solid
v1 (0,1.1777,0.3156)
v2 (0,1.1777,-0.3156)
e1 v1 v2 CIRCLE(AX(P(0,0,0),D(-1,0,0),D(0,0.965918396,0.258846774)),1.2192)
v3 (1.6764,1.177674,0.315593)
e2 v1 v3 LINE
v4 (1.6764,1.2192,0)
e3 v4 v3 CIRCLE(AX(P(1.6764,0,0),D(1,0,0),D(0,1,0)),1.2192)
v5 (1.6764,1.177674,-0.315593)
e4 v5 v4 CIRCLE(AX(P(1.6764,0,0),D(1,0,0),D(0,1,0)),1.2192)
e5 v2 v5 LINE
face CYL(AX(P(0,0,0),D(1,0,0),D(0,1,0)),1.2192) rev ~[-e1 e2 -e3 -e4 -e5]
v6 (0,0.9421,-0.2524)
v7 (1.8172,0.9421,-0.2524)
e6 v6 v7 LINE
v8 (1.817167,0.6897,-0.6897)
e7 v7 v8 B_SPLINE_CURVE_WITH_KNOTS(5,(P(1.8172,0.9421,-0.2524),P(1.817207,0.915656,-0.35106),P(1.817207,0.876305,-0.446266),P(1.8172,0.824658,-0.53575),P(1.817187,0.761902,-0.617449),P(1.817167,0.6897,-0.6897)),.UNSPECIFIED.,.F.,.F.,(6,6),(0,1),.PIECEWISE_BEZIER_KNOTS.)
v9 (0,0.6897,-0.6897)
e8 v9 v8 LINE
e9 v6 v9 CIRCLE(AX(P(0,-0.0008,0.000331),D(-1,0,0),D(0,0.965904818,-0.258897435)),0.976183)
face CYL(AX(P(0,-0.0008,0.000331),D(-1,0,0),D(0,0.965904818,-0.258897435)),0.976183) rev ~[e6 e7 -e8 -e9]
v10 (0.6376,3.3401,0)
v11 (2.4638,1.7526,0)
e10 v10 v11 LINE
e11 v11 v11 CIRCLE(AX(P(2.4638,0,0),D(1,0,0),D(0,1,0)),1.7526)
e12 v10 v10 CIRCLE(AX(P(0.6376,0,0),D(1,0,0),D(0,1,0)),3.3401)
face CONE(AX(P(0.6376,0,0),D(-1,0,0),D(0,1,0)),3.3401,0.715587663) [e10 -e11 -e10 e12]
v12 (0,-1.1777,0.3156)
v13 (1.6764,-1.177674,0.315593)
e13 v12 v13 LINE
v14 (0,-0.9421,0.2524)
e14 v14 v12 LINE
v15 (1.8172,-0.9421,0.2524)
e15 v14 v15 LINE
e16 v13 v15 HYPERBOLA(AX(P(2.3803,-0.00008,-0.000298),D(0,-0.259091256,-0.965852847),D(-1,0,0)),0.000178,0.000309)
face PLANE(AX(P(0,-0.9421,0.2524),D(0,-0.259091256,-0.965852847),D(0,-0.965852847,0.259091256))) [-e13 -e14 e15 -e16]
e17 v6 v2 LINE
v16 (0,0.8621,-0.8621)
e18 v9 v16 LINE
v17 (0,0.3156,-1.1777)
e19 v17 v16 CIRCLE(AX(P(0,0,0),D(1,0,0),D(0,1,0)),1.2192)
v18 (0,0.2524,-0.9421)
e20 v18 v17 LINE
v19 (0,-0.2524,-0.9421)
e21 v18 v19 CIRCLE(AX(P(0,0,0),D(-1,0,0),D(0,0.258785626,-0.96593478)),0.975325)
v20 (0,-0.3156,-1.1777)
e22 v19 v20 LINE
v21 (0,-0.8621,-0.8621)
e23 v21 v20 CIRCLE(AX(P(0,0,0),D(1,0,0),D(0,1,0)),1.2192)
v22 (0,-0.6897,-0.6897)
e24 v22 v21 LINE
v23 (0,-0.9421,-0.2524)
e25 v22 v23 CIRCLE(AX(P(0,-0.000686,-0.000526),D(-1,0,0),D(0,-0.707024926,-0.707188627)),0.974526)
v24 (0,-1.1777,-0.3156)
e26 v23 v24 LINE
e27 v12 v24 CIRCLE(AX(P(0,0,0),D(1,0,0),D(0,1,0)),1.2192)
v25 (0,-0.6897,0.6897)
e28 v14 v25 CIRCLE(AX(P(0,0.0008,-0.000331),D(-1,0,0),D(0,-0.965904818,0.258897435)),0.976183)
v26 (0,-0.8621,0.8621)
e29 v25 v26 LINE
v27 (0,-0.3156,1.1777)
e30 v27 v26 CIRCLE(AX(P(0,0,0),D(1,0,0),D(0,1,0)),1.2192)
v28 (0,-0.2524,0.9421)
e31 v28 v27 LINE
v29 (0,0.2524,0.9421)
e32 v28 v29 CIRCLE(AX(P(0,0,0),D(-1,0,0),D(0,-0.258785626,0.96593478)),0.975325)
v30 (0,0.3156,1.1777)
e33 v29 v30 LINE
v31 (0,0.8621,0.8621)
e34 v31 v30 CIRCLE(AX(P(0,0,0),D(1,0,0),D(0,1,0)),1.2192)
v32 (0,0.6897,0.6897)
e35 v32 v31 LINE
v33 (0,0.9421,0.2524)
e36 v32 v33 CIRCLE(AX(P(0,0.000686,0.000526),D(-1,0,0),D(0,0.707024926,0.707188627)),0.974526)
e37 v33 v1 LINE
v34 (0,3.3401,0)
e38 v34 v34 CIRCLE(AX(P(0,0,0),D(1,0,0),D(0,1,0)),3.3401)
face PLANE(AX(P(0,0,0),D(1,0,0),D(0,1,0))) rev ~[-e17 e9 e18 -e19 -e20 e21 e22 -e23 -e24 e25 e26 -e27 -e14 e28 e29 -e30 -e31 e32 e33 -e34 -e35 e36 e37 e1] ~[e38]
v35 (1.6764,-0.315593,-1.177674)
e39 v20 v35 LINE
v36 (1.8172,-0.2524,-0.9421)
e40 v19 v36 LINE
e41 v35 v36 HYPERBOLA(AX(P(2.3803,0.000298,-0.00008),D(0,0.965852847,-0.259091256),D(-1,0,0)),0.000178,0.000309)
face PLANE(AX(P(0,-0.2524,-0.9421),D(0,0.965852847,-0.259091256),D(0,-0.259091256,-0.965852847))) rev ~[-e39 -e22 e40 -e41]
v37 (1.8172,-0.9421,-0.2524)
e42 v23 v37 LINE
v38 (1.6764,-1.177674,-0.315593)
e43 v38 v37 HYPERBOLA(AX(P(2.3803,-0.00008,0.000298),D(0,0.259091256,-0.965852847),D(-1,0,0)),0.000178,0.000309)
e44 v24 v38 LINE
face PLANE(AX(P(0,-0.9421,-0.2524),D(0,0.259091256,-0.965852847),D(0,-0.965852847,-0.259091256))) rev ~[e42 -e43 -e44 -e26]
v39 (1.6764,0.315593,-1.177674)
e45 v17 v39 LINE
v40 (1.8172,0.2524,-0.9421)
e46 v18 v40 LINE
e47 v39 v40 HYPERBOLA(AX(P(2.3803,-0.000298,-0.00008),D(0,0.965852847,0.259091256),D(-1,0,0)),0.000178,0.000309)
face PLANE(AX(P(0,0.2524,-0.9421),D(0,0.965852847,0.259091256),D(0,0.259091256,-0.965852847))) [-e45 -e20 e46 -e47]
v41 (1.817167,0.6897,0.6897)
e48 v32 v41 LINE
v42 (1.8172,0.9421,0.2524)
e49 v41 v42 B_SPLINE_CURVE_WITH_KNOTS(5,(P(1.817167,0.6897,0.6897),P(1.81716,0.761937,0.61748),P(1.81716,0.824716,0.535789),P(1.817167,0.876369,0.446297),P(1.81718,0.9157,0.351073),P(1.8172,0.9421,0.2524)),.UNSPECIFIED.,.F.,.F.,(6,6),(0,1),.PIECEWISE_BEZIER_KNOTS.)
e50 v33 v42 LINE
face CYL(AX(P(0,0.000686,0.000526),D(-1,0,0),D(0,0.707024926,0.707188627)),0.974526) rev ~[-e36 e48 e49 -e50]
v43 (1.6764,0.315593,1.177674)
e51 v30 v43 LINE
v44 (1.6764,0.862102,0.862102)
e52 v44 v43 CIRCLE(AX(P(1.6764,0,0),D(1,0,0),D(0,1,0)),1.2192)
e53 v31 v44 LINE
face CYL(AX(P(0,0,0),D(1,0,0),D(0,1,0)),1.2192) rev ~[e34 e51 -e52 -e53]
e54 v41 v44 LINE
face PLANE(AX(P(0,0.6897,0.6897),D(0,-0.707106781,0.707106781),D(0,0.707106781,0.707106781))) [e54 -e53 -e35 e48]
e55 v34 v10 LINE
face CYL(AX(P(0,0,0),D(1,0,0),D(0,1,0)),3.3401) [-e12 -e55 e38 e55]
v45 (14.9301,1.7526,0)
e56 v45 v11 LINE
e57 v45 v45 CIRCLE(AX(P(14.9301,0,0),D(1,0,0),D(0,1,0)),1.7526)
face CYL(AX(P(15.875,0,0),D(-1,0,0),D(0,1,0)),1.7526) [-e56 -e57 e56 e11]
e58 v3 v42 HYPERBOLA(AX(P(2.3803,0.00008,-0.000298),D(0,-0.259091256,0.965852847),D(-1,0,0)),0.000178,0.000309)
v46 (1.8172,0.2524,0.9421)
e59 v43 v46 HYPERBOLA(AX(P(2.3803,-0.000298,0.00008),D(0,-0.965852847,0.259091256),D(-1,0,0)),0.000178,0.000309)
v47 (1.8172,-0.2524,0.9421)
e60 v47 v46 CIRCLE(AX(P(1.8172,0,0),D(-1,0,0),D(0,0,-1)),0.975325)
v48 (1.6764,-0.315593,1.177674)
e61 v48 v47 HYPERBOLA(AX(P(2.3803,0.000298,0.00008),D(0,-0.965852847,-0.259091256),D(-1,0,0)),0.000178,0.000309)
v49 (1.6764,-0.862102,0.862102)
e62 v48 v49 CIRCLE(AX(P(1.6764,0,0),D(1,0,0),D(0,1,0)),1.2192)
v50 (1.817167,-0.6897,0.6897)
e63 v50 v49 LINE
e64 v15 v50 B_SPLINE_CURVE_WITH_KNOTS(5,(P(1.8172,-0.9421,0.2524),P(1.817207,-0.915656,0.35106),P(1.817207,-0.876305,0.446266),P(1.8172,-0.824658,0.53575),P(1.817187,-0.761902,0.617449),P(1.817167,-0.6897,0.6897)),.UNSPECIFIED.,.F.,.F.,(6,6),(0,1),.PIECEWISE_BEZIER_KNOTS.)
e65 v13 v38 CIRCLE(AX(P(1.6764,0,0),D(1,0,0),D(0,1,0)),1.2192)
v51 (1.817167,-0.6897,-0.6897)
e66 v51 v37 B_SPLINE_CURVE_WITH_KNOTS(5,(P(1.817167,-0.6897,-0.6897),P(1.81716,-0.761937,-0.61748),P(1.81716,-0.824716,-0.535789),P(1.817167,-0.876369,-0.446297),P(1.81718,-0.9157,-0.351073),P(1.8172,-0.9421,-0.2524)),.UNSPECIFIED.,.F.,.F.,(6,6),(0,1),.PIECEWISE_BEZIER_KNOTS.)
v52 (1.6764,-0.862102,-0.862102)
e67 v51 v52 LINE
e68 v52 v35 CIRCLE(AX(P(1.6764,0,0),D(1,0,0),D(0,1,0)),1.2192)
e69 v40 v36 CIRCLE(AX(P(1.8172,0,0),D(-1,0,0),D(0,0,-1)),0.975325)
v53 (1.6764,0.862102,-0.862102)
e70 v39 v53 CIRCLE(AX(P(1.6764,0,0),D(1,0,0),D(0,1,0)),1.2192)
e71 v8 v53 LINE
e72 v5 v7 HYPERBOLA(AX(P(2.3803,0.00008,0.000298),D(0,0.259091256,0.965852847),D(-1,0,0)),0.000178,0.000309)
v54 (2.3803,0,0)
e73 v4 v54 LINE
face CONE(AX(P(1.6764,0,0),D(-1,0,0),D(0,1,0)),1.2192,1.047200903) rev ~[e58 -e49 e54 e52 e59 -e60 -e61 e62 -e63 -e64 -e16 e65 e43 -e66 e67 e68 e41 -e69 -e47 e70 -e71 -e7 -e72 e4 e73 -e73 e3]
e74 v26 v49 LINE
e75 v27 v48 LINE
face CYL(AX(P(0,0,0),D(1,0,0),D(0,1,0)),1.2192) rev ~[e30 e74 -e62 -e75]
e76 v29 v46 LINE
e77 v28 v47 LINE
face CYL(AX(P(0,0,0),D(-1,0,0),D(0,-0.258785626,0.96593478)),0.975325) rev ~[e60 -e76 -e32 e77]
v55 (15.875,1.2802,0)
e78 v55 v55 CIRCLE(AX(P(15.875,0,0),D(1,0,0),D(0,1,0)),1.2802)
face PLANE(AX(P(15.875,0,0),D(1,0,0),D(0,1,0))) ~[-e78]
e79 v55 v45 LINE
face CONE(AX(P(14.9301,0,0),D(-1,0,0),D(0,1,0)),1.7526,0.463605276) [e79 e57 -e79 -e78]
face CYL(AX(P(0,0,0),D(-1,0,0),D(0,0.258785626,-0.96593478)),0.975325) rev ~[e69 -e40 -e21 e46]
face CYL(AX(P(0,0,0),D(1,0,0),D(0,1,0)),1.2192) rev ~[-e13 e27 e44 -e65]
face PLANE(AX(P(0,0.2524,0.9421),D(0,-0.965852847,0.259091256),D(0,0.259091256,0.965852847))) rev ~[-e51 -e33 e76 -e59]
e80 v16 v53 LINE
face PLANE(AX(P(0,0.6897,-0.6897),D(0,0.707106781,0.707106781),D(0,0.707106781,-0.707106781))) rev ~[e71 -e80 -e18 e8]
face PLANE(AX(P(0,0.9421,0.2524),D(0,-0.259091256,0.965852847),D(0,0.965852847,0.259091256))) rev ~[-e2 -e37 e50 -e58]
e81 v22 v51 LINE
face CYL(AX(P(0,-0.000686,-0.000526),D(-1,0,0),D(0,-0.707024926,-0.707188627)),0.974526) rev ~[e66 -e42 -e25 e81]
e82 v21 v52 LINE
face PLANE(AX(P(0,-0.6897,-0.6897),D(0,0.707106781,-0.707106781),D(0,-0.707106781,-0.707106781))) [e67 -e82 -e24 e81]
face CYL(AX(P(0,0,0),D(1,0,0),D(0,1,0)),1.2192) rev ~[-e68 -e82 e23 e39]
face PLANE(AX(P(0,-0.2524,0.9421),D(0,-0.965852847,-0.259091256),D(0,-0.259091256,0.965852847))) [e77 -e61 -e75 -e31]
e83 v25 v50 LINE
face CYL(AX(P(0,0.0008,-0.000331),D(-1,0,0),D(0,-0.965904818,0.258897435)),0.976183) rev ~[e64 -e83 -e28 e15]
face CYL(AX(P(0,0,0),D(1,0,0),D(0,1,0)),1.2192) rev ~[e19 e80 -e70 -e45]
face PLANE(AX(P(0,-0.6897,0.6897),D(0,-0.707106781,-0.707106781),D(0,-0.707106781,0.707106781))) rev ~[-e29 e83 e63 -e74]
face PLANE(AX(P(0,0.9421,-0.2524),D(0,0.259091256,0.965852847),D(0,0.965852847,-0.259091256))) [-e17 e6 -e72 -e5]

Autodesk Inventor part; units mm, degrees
ref_plane "YZ Plane" through (0, 0, 0) normal (1, 0, 0) x (0, 1, 0)
ref_plane "XZ Plane" through (0, 0, 0) normal (0, 1, 0) x (-1, 0, 0)
sketch "Sketch1" plane through (0, 0, 0) normal (0, 0, 1) x (1, 0, 0)
  line L0 (15.875, 0) -> (15.875, 1.7526)
  line L1 (15.875, 1.7526) -> (2.4638, 1.7526)
  line L2 (0, 3.3401) -> (0, 1.2192)
  line L3 (0, 1.2192) -> (1.6764, 1.2192)
  line L4 (1.6764, 1.2192) -> (2.3803, 0)
  line L5 (2.3803, 0) -> (15.875, 0)
  line L6 (0, 3.3401) -> (0.6376, 3.3401)
  line L7 (0.6376, 3.3401) -> (2.4638, 1.7526)
  line L8 (-3.175, 0) -> (19.05, 0) projected
  line L9 (0, -0.668) -> (0, 4.0081) projected
  dimension "d0" = 15.875
  dimension "d1" = 1.6764
  dimension "d2" = 3.5052
  dimension "d3" = 2.4638
  dimension "d4" = 41
  dimension "d5" = 2.4384
  dimension "d6" = 60
  dimension "d7" = 6.6802
revolve "Body" add sketch "Sketch1" angle 360 about axis through (2.3803, 0, 0) along (1, 0, 0) contours L5 L4 L3 L2 L6 L7 L1 L0
sketch "Sketch2" plane through (0, 0, 0) normal (-1, 0, 0) x (0, 0, 1)
  circle A0 centre (0, 0) radius 3.3401 projected
  circle A1 centre (0, 0) radius 1.2192 projected
  line L0 (0.9421, 0.2524) -> (1.1777, 0.3156)
  line L1 (0.9421, -0.2524) -> (1.1777, -0.3156)
  arc A2 (0.9421, -0.2524) -> (0.9421, 0.2524) centre (0, 0) ccw
  arc A3 (1.1777, -0.3156) -> (1.1777, 0.3156) centre (0, 0) ccw
  line L2 (0, -4.6761) -> (0, 4.6761) projected
  line L3 (-4.6761, 0) -> (4.6761, 0) projected
  line L4 (0.9421, 0.2524) -> (0, 0) construction
  line L5 (0, 0) -> (0.9421, -0.2524) construction
  line L6 (0.2524, 0.9421) -> (0.3156, 1.1777)
  line L7 (0.6897, 0.6897) -> (0.8621, 0.8621)
  arc A4 (0.6897, 0.6897) -> (0.2524, 0.9421) centre (0, 0) ccw
  arc A5 (0.8621, 0.8621) -> (0.3156, 1.1777) centre (0, 0) ccw
  line L8 (-0.6897, 0.6897) -> (-0.8621, 0.8621)
  line L9 (-0.2524, 0.9421) -> (-0.3156, 1.1777)
  arc A6 (-0.2524, 0.9421) -> (-0.6897, 0.6897) centre (0, 0) ccw
  arc A7 (-0.3156, 1.1777) -> (-0.8621, 0.8621) centre (0, 0) ccw
  line L10 (-0.9421, -0.2524) -> (-1.1777, -0.3156)
  line L11 (-0.9421, 0.2524) -> (-1.1777, 0.3156)
  arc A8 (-0.9421, 0.2524) -> (-0.9421, -0.2524) centre (0, 0) ccw
  arc A9 (-1.1777, 0.3156) -> (-1.1777, -0.3156) centre (0, 0) ccw
  line L12 (-0.2524, -0.9421) -> (-0.3156, -1.1777)
  line L13 (-0.6897, -0.6897) -> (-0.8621, -0.8621)
  arc A10 (-0.6897, -0.6897) -> (-0.2524, -0.9421) centre (0, 0) ccw
  arc A11 (-0.8621, -0.8621) -> (-0.3156, -1.1777) centre (0, 0) ccw
  line L14 (0.6897, -0.6897) -> (0.8621, -0.8621)
  line L15 (0.2524, -0.9421) -> (0.3156, -1.1777)
  arc A12 (0.2524, -0.9421) -> (0.6897, -0.6897) centre (0, 0) ccw
  arc A13 (0.3156, -1.1777) -> (0.8621, -0.8621) centre (0, 0) ccw
  dimension "d8" = 1.9507
  dimension "d9" = 2.4384
  dimension "d10" = 15
  dimension "d11" = 15
  dimension "d22" = 360
extrude "Slot" add sketch "Sketch2" against normal up to next contours L3 A2 L0 A1 | A1 L1 A2 L3 | L3 A8 L10 A1 | A1 L11 A8 L3 | A1 L7 A4 L6 | L9 A6 L8 A1 | A1 L13 A10 L12 | L15 A12 L14 A1
thread "Thread" size "6-32 UNC" class "2A" standard "ANSI Unified Screw Threads" length 11.427
chamfer "Chamfer1" distance 0.4724 distance2 0.9449 1 edges at (15.875, -1.7526, 0) measured on face at (15.875, -0.7696, -0.2093)
ref_plane "Work Plane1" through (66.6877, 0, 0) normal (0, 0, -1) x (1, 0, 0)
equation "\"d0\" = NLG"
equation "\"d1\" = INTI"
equation "\"d2\" = GD"
equation "\"d3\" = KOH"
equation "\"d4\" = 0.5 * SEWI"
equation "\"d5\" = SW"
equation "\"d7\" = KOD"
equation "\"d8\" = 0.8 * SW"
equation "\"d9\" = SW"
equation "\"d15\" = GEL"
equation "\"d17\" = -0.5 * SPD + 0.5 * GD"
equation "\"d18\" = GUL"
equation "\"NLG\" = 15.875"
equation "\"SW\" = 2.4384"
equation "\"INTI\" = 1.6764"
equation "\"GEL\" = 11.42695"
equation "\"KOH\" = 2.4638"
equation "\"KOD\" = 6.6802"
equation "\"GUL\" = 0.94488"
equation "\"SPD\" = 2.56032"
equation "\"GD\" = NND"
equation "\"SEWI\" = 82deg"
equation "\"TOA\" = 30deg"
equation "\"GD1\" = SPD"
equation "\"EPV\" = 4.4794"
equation "\"THREADDIA\" = 3.5052"
equation "\"BDM\" = NND"
equation "\"NND\" = 3.5052"
equation "\"GAL\" = 1.9845"
equation "\"E0\" = 1.155 * SW"
properties part number "ANSI B18.3 - 6-32 UNC x 0.625, SSFCHCSI" material "Steel, Mild"
